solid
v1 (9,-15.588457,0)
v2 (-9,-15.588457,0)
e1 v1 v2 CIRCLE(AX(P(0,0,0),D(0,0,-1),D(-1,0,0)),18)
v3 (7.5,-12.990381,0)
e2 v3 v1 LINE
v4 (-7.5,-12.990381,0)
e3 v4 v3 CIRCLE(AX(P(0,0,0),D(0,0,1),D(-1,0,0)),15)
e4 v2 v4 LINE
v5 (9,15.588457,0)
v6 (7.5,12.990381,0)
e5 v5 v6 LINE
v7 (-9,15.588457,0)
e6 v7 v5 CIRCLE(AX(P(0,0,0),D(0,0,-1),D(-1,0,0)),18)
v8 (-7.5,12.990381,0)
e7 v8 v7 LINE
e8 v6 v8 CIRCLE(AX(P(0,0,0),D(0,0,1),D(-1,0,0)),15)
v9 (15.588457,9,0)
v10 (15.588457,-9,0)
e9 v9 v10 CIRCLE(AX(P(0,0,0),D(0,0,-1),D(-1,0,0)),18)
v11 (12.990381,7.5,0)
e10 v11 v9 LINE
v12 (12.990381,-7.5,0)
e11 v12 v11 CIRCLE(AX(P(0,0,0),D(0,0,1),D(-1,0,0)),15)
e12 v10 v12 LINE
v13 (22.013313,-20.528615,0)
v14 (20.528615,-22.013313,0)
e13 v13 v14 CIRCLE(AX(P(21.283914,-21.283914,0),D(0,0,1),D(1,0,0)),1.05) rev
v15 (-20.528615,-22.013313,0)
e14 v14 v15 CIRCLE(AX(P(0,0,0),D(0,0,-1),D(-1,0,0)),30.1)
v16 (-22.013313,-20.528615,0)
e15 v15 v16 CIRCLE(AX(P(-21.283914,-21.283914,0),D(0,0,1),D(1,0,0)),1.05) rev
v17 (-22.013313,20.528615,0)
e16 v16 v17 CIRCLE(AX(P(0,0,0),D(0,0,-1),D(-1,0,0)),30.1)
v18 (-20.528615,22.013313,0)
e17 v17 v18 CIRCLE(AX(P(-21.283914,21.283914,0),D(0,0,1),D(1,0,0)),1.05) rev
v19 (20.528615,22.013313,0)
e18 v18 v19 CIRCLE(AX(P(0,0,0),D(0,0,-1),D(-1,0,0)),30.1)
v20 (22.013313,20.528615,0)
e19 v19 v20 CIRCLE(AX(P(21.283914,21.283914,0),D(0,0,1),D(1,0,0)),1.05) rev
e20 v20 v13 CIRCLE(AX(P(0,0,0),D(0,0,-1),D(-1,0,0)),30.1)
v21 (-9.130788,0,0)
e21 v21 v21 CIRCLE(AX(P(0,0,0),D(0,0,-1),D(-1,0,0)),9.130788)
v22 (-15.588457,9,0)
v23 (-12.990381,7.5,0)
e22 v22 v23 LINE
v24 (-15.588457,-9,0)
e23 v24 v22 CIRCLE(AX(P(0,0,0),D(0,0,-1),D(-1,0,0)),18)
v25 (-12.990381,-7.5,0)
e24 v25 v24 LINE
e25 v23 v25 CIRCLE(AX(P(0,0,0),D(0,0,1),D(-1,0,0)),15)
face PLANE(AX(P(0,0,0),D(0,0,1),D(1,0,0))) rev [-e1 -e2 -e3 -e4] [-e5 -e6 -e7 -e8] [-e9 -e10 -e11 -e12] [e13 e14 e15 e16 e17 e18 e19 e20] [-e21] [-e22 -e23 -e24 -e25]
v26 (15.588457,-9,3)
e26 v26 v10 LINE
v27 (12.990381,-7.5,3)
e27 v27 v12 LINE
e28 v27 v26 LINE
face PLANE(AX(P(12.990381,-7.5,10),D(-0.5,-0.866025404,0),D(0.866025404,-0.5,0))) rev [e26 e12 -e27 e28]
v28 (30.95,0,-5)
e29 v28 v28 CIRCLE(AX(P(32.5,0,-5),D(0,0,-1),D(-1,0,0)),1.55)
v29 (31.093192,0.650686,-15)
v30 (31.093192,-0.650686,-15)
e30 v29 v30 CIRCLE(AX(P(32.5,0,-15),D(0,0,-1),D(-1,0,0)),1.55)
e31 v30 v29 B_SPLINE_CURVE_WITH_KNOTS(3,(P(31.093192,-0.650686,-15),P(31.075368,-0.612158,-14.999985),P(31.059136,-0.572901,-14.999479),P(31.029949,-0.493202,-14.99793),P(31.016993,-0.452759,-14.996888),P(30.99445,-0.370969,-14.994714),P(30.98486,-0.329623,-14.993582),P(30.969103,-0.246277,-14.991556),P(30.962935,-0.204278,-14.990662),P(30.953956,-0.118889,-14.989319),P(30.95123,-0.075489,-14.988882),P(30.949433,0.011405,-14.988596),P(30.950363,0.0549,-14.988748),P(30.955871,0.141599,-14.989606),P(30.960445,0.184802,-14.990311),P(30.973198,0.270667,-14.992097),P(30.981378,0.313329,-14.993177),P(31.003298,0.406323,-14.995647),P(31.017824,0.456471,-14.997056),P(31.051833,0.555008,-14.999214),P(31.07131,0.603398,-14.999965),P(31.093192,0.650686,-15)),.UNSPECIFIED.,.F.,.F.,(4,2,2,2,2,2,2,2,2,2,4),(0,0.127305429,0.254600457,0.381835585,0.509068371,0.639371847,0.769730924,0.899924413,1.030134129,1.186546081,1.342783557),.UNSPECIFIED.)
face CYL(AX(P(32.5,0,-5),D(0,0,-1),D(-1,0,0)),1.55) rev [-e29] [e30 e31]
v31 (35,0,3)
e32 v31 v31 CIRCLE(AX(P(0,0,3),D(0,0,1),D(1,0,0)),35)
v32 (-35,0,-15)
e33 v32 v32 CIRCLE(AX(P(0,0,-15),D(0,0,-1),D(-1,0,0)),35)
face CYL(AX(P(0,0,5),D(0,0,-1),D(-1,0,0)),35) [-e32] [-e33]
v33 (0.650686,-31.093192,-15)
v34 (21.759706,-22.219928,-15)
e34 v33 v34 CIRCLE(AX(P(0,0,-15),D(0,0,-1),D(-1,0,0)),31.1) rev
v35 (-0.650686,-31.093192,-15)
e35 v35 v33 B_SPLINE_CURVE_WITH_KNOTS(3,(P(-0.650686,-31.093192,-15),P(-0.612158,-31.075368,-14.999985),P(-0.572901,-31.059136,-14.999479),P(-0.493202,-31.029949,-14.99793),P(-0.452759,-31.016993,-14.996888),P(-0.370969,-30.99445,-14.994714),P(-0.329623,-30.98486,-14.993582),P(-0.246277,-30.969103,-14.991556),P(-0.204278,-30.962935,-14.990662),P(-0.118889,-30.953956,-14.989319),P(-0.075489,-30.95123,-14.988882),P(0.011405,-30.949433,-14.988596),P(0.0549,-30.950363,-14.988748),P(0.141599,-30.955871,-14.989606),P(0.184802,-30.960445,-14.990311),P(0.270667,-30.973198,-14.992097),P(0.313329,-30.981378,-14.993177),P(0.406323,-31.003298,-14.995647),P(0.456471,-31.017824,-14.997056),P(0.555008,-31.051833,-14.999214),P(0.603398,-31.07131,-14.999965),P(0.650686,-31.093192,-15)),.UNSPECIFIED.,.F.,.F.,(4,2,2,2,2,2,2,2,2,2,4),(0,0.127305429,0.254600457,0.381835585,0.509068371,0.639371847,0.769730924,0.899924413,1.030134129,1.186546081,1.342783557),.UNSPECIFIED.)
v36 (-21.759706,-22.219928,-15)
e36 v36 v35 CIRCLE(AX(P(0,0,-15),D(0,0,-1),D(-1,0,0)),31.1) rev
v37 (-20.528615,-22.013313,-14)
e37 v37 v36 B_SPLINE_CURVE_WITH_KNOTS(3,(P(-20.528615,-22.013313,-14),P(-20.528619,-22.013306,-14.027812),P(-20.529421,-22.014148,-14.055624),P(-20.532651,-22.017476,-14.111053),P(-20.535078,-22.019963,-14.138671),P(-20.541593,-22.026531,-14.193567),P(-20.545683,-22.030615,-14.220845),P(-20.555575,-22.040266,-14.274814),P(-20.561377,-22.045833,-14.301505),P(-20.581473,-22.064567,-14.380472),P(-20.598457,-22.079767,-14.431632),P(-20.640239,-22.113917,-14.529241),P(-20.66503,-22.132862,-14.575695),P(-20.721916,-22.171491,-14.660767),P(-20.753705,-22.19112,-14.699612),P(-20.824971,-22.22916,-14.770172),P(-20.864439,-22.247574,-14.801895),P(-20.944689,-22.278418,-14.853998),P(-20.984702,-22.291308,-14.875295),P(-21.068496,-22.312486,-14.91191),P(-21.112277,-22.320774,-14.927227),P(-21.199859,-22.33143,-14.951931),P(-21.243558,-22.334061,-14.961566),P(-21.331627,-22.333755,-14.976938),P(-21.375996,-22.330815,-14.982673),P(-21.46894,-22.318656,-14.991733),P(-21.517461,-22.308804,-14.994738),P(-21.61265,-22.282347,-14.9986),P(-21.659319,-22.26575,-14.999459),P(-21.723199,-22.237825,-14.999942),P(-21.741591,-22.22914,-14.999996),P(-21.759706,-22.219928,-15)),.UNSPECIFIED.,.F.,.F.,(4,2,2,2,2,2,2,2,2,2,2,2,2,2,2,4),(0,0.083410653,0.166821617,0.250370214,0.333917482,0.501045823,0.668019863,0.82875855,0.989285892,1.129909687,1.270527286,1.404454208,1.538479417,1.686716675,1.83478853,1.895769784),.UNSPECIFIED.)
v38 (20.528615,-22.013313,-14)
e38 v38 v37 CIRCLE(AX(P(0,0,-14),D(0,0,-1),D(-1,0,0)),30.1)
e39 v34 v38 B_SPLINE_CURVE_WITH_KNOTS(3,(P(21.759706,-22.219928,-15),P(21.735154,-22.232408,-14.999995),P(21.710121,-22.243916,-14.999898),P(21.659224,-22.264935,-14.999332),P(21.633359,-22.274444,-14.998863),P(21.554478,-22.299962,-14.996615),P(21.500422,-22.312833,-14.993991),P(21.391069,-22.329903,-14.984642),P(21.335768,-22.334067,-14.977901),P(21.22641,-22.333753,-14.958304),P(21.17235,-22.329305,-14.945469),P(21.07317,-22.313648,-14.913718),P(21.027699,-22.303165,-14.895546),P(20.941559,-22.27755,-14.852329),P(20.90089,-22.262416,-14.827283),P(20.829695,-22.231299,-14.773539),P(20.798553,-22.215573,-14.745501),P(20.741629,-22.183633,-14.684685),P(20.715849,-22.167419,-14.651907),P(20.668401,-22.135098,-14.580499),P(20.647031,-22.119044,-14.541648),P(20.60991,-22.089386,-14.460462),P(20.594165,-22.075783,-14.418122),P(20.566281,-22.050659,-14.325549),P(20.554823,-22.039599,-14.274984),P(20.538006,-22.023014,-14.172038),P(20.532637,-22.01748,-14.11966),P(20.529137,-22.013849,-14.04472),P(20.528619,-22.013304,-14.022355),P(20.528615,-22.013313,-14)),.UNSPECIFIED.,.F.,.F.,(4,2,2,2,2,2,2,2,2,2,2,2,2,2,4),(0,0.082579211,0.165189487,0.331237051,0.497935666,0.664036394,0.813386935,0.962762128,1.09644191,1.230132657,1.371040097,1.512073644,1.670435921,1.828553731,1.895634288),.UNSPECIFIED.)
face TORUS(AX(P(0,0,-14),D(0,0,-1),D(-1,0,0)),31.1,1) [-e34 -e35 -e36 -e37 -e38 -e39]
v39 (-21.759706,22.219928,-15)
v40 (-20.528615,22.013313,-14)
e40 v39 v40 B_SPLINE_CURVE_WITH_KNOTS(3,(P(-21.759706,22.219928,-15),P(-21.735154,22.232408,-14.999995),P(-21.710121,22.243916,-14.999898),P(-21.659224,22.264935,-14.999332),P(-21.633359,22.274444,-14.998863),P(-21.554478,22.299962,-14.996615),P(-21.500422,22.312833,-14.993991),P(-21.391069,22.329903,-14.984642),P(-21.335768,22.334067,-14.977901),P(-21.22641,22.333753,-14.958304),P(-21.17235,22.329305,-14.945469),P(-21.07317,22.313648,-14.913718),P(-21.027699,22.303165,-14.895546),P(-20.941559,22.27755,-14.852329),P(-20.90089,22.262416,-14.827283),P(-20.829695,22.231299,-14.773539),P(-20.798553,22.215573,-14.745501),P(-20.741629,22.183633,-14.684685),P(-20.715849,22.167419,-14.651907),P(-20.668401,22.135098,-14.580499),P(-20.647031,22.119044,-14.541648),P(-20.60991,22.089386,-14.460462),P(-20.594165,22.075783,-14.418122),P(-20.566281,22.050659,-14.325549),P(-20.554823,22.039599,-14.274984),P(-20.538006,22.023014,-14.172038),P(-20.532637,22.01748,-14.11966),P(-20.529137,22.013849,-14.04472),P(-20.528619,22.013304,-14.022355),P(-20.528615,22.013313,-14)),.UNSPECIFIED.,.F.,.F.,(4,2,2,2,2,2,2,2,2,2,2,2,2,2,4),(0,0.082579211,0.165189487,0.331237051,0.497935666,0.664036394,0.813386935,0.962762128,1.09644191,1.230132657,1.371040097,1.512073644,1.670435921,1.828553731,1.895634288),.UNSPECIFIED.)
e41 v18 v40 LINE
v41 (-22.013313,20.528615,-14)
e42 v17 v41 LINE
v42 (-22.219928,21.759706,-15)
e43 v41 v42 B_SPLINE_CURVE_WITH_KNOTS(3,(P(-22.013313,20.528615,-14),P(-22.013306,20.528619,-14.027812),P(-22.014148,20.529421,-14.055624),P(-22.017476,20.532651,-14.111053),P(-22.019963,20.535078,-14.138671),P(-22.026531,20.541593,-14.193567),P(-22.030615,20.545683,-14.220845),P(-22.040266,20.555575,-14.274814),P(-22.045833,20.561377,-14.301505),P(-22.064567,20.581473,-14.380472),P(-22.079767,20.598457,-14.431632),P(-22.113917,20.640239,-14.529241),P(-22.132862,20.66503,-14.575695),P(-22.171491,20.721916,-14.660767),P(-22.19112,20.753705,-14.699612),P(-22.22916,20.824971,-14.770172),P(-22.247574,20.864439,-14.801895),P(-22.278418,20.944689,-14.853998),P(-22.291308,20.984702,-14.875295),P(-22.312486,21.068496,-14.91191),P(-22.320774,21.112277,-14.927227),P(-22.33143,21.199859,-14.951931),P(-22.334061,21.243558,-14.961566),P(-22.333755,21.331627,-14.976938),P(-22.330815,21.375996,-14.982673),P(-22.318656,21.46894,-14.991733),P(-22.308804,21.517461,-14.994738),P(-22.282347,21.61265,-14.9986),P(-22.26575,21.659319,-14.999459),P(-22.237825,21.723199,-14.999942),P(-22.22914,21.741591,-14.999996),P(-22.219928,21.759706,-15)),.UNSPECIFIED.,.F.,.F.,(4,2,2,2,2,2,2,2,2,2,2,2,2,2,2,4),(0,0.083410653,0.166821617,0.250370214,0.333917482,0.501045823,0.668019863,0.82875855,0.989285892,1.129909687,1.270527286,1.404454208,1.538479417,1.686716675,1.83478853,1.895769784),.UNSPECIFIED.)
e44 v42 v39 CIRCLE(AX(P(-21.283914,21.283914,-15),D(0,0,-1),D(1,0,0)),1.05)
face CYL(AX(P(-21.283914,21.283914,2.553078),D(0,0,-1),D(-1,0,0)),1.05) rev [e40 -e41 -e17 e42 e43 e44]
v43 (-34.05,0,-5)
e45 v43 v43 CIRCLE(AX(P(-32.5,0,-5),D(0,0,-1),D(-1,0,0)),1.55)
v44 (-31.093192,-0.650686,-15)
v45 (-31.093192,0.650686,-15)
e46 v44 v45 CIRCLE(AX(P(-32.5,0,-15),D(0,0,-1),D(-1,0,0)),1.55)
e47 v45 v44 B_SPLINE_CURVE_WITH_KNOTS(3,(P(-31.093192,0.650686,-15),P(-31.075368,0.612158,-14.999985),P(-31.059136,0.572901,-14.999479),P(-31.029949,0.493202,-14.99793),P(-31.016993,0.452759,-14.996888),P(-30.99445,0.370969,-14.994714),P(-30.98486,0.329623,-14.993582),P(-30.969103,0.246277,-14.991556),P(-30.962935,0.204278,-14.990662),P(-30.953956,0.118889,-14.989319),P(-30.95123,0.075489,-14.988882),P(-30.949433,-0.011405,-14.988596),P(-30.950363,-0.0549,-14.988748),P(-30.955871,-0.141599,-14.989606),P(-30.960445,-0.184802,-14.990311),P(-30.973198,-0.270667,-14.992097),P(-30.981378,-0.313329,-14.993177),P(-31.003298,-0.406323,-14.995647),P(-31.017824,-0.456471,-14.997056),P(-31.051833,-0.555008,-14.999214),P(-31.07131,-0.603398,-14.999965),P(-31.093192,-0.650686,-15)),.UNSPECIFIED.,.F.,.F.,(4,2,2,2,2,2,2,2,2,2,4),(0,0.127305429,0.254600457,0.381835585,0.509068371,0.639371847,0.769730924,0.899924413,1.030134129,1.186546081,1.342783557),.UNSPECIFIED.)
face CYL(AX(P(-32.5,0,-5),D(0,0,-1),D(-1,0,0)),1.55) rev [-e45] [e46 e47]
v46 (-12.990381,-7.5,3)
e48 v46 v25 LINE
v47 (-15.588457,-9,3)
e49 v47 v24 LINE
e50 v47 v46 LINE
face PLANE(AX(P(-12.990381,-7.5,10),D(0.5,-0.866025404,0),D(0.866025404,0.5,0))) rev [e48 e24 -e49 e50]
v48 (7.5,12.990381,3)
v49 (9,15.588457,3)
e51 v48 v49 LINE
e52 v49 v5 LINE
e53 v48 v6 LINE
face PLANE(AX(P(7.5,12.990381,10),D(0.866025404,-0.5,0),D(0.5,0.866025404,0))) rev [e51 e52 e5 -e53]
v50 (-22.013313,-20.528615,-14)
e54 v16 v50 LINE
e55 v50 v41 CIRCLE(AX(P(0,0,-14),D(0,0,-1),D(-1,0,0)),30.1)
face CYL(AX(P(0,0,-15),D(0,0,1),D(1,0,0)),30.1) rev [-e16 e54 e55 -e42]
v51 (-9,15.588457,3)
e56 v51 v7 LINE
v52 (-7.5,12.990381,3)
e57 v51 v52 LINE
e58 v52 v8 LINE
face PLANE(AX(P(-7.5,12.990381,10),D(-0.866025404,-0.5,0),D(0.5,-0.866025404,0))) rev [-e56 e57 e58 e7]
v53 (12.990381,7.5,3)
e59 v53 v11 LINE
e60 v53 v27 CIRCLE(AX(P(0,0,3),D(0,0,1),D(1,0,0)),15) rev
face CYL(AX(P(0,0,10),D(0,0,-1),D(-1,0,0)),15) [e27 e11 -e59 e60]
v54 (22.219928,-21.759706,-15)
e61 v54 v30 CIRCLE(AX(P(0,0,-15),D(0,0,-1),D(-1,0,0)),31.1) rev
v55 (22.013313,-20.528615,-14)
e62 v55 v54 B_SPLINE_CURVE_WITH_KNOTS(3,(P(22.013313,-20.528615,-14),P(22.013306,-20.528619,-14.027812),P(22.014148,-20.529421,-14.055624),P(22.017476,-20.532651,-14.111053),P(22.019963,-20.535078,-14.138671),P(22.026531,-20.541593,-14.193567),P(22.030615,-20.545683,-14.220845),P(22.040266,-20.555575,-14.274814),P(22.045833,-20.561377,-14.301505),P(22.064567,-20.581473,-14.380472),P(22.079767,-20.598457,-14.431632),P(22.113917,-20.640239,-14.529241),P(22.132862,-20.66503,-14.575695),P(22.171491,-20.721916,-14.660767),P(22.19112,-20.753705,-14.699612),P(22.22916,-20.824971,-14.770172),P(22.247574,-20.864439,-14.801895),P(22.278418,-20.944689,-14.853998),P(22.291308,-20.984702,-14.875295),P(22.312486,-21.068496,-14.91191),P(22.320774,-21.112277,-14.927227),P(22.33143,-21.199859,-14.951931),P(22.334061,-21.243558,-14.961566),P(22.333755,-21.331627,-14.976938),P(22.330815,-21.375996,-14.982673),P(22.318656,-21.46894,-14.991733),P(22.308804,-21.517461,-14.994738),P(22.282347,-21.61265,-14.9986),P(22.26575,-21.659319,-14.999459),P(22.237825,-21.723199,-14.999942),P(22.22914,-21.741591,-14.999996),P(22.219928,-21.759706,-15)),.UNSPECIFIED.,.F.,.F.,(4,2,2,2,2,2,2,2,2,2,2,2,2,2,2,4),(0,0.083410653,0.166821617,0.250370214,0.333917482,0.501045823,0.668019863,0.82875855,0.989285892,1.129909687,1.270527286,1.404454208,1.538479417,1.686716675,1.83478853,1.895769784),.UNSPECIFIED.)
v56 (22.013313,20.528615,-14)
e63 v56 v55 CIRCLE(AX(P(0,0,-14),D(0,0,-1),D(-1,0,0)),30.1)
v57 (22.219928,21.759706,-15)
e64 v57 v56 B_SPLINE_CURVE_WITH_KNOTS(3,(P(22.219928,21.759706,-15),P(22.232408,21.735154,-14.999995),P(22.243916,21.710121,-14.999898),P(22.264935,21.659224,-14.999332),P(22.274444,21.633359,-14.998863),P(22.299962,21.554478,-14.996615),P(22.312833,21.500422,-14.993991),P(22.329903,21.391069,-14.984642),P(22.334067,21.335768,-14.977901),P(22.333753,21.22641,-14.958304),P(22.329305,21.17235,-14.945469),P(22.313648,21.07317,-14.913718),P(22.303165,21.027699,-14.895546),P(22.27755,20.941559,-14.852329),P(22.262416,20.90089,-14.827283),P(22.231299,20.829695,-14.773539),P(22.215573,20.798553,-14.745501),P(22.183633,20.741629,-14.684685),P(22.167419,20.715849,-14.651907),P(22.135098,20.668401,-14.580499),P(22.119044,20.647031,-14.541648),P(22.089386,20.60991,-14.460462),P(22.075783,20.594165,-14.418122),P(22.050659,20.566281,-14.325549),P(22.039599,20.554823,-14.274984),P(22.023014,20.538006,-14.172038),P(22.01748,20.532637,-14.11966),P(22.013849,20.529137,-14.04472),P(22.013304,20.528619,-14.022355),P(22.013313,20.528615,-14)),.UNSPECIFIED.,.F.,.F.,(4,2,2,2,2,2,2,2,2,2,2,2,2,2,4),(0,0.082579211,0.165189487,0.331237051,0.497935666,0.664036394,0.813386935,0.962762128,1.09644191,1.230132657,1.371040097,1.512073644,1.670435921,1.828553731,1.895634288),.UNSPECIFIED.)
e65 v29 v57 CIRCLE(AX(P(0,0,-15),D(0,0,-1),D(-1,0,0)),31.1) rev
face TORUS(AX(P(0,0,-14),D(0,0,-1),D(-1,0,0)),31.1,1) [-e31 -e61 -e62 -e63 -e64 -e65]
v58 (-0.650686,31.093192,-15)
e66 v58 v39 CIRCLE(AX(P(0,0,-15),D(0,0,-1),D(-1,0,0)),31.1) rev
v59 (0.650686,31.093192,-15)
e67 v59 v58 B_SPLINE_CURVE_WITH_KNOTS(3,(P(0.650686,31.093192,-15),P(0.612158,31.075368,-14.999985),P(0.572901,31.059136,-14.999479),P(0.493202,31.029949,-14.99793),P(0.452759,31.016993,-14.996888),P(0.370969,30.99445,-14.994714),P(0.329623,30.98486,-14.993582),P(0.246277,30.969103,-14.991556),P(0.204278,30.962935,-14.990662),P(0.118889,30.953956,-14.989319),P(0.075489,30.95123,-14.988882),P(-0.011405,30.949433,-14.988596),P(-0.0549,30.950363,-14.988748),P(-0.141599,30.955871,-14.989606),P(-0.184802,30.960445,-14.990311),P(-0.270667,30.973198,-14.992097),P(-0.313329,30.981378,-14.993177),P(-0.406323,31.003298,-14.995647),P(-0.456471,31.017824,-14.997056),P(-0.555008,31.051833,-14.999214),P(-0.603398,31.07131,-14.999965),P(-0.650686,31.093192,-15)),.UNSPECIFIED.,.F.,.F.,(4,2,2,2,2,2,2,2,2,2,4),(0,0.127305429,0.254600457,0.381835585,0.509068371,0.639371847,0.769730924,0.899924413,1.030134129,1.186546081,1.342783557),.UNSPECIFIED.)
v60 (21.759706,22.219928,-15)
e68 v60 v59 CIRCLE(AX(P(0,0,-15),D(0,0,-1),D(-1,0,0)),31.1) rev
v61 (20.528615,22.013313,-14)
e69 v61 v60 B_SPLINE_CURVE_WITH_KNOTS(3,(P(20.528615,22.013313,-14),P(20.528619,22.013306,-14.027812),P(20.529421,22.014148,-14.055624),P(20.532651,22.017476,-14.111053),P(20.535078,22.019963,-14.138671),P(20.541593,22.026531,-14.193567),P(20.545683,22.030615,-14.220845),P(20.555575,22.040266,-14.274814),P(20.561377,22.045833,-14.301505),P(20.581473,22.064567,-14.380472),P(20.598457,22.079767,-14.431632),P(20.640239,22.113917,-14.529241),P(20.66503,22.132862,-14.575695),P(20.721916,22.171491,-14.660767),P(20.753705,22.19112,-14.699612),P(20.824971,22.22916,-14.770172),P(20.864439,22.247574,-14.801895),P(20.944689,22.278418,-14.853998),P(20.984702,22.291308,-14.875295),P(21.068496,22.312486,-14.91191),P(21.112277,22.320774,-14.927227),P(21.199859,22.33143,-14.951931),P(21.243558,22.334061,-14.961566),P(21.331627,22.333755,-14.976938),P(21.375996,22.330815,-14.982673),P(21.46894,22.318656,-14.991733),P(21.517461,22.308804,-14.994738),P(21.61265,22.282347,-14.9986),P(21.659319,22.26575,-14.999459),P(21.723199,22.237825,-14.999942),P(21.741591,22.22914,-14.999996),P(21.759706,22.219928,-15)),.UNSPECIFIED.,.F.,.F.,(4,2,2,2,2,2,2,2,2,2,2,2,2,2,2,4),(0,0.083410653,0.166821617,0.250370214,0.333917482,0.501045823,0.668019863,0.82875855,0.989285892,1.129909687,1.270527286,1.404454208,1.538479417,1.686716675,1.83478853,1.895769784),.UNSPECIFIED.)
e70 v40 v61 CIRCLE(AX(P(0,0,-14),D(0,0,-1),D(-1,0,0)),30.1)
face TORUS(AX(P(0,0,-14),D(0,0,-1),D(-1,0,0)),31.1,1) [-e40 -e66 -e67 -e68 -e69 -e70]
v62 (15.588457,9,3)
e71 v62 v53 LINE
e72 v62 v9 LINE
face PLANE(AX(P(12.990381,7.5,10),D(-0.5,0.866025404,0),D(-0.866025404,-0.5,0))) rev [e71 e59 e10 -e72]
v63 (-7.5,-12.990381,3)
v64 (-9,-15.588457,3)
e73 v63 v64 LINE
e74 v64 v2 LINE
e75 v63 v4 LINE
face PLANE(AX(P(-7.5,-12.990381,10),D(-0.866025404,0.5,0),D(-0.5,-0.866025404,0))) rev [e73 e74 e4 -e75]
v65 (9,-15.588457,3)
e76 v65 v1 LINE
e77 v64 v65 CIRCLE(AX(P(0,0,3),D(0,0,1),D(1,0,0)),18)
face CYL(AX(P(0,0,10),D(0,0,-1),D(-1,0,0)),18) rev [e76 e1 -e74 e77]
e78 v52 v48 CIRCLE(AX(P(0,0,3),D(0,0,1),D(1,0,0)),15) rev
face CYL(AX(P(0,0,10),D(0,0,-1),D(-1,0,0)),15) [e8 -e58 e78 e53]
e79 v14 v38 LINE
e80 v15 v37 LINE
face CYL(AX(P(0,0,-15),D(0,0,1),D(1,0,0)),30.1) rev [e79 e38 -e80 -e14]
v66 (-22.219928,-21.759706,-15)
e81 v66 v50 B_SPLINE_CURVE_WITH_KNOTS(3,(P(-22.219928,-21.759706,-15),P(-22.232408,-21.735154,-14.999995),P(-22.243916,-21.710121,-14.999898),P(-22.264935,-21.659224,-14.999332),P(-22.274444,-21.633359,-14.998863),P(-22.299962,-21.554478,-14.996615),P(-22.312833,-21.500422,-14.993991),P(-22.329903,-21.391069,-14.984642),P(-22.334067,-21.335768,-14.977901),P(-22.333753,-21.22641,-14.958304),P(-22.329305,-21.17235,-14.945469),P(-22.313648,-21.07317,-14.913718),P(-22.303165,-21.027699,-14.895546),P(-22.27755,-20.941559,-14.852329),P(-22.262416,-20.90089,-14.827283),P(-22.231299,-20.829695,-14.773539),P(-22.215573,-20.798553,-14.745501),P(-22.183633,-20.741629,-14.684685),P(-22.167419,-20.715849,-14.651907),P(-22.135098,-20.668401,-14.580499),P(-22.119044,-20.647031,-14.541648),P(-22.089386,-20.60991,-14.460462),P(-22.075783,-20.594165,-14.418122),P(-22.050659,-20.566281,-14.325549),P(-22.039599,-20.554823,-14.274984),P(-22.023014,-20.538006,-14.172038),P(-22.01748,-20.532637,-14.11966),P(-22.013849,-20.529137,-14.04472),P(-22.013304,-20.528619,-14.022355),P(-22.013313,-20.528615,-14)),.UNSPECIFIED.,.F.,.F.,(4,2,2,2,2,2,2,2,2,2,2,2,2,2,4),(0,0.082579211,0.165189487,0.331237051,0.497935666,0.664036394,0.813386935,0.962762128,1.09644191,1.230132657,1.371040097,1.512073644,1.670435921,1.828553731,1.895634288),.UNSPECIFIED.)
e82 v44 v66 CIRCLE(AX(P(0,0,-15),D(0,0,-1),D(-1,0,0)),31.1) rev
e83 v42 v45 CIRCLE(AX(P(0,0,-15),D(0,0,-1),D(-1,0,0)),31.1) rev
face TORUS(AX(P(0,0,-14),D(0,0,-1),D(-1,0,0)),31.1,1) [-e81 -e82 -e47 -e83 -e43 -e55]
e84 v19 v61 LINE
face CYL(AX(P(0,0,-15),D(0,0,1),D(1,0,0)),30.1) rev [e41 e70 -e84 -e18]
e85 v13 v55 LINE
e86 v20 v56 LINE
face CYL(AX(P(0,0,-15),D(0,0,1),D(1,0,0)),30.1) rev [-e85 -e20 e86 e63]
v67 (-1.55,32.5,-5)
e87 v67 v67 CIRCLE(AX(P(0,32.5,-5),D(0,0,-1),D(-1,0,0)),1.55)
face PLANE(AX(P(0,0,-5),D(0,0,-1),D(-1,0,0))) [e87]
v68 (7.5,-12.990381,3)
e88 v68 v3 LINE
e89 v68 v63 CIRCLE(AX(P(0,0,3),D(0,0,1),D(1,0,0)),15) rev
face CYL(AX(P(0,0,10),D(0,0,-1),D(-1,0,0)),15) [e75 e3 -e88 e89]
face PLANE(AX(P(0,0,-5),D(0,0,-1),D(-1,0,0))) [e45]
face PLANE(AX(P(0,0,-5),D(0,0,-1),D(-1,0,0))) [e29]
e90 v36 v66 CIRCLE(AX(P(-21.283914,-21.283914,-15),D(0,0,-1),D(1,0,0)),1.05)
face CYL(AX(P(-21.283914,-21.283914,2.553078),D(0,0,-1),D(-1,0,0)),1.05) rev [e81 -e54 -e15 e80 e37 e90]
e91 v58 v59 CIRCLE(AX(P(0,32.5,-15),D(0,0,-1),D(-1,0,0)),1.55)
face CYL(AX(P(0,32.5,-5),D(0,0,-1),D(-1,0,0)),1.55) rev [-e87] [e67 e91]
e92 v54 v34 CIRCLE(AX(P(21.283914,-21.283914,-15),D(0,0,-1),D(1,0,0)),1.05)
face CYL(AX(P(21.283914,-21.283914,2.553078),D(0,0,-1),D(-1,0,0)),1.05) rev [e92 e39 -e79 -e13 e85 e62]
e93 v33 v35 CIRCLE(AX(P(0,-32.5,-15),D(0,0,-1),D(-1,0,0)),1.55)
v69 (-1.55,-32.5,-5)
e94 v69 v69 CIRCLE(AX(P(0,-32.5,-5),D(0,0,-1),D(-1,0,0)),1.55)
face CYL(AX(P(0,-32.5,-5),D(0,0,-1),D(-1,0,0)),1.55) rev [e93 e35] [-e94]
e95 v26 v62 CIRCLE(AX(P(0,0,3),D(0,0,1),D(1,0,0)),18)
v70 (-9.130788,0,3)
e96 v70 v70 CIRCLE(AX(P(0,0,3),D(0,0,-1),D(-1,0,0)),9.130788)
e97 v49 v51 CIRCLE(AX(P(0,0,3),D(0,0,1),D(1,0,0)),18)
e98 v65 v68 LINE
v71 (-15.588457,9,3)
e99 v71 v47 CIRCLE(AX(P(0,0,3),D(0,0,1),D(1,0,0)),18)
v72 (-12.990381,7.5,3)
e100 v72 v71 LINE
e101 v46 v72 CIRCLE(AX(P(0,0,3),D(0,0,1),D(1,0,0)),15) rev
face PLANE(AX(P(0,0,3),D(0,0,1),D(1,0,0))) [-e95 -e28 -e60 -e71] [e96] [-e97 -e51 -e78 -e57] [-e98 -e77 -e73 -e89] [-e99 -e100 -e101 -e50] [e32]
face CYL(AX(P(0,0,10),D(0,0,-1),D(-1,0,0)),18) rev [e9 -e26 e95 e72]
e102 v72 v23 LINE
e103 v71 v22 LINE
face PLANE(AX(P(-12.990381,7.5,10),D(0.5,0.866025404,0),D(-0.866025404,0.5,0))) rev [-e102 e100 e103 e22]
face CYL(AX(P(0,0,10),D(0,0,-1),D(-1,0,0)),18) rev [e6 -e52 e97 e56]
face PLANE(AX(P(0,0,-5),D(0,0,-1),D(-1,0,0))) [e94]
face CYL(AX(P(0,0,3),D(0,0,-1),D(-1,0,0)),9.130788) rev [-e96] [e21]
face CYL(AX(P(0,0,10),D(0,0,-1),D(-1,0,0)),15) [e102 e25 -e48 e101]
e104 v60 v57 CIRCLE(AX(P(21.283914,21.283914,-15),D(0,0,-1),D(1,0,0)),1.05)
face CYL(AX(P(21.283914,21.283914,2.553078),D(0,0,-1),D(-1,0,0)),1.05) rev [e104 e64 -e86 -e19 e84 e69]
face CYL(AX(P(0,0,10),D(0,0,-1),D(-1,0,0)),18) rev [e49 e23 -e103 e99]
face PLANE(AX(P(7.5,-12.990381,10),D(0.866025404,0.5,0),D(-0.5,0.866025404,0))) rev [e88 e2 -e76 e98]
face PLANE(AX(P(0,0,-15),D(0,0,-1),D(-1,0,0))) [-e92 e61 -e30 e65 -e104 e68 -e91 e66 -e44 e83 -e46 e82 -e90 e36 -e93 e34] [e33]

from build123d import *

# Parameters (mm, degrees)
SKETCH_2_R          = 35
SKETCH_2_R_2        = 5.5
EXTRUDE_1_DEPTH     = 5
EXTRUDE_START       = 15
SKETCH_3_R          = 35
SKETCH_3_R_2        = 30.1
EXTRUDE_2_DEPTH     = 15
SKETCH_4_R          = 1.55
CUT_EXTRUDE_1_DEPTH = 10
CUT_EXTRUDE_5_DEPTH = 15
FILLET_1_R          = 1
CUT_EXTRUDE_START   = -2
SKETCH_10_R         = 35
CUT_EXTRUDE_6_DEPTH = 2
CUT_EXTRUDE_7_DEPTH = 10
SKETCH1_R           = 9.130787709
CUT_EXTRUDE1_DEPTH  = 52.720402193


with BuildPart() as part:
    # 草图2 → 凸台-拉伸1 (new body)
    with BuildSketch(Plane.XY):
        Circle(SKETCH_2_R)
        Circle(SKETCH_2_R_2, mode=Mode.SUBTRACT)
    extrude(amount=EXTRUDE_1_DEPTH)

    # 草图3 → 凸台-拉伸2 (add)
    with BuildSketch(Plane(origin=(0, 0, 0), x_dir=(-1, 0, 0), z_dir=(0, 0, -1)).offset(EXTRUDE_START)):
        Circle(SKETCH_3_R)
        Circle(SKETCH_3_R_2, mode=Mode.SUBTRACT)
    extrude(amount=-EXTRUDE_2_DEPTH)

    # 草图4 → 切除-拉伸1 (cut)
    with BuildSketch(Plane(origin=(0, 0, -15), x_dir=(-1, 0, 0), z_dir=(0, 0, -1))):
        with Locations((0, 32.5)):
            Circle(SKETCH_4_R)
        with Locations((32.5, 0)):
            Circle(SKETCH_4_R)
        with Locations((0, -32.5)):
            Circle(SKETCH_4_R)
        with Locations((-32.5, 0)):
            Circle(SKETCH_4_R)
    extrude(amount=-CUT_EXTRUDE_1_DEPTH, mode=Mode.SUBTRACT)

    # 草图9 → 切除-拉伸5 (cut)
    with BuildSketch(Plane(origin=(0, 0, -15), x_dir=(-1, 0, 0), z_dir=(0, 0, -1))):
        with BuildLine():
            ThreePointArc((-22.013313369, 20.528615017), (-22.026376234, 22.026376234), (-20.528615017, 22.013313369))
            ThreePointArc((-20.528615017, 22.013313369), (-21.283914114, 21.283914114), (-22.013313369, 20.528615017))
        make_face()
        with BuildLine():
            ThreePointArc((20.528615017, 22.013313369), (22.026376234, 22.026376234), (22.013313369, 20.528615017))
            ThreePointArc((22.013313369, 20.528615017), (21.283914114, 21.283914114), (20.528615017, 22.013313369))
        make_face()
        with BuildLine():
            ThreePointArc((22.013313369, -20.528615017), (22.026376234, -22.026376234), (20.528615017, -22.013313369))
            ThreePointArc((20.528615017, -22.013313369), (21.283914114, -21.283914114), (22.013313369, -20.528615017))
        make_face()
        with BuildLine():
            ThreePointArc((-20.528615017, -22.013313369), (-22.026376234, -22.026376234), (-22.013313369, -20.528615017))
            ThreePointArc((-22.013313369, -20.528615017), (-21.283914114, -21.283914114), (-20.528615017, -22.013313369))
        make_face()
    extrude(amount=-CUT_EXTRUDE_5_DEPTH, mode=Mode.SUBTRACT)

    # 圆角1
    # the kernel refuses this fillet: 1 mm, written as the material it takes off along each edge
    with BuildSketch(Plane(origin=(0, 0, -15), x_dir=(-0.7403558797037455, 0.6722151228498904, 0), z_dir=(-0.6722151228498904, -0.7403558797037455, 0))) as fillet_1_piece_1:
        with BuildLine():
            CenterArc((30.1 + FILLET_1_R, -FILLET_1_R), FILLET_1_R, 90, 90)
            Line((30.1, -FILLET_1_R), (30.1, 0))
            Line((30.1, 0), (30.1 + FILLET_1_R, 0))
        make_face()
    revolve(axis=Axis((0, 0, -15), (0, 0, -1)), revolution_arc=95.523479776, mode=Mode.SUBTRACT)
    with BuildSketch(Plane(origin=(0, 0, -15), x_dir=(0.6722151228498918, 0.7403558797037441, 0), z_dir=(-0.7403558797037441, 0.6722151228498918, 0))) as fillet_1_piece_2:
        with BuildLine():
            CenterArc((30.1 + FILLET_1_R, -FILLET_1_R), FILLET_1_R, 90, 90)
            Line((30.1, -FILLET_1_R), (30.1, 0))
            Line((30.1, 0), (30.1 + FILLET_1_R, 0))
        make_face()
    revolve(axis=Axis((0, 0, -15), (0, 0, -1)), revolution_arc=95.523479776, mode=Mode.SUBTRACT)
    with BuildSketch(Plane(origin=(0, 0, -15), x_dir=(0.7403558797037453, -0.6722151228498905, 0), z_dir=(0.6722151228498905, 0.7403558797037453, 0))) as fillet_1_piece_3:
        with BuildLine():
            CenterArc((30.1 + FILLET_1_R, -FILLET_1_R), FILLET_1_R, 90, 90)
            Line((30.1, -FILLET_1_R), (30.1, 0))
            Line((30.1, 0), (30.1 + FILLET_1_R, 0))
        make_face()
    revolve(axis=Axis((0, 0, -15), (0, 0, -1)), revolution_arc=95.523479776, mode=Mode.SUBTRACT)
    with BuildSketch(Plane(origin=(0, 0, -15), x_dir=(-1, 0, 0), z_dir=(0, -1, 0))) as fillet_1_piece_4:
        with BuildLine():
            CenterArc((30.1 + FILLET_1_R, -FILLET_1_R), FILLET_1_R, 90, 90)
            Line((30.1, -FILLET_1_R), (30.1, 0))
            Line((30.1, 0), (30.1 + FILLET_1_R, 0))
        make_face()
    revolve(axis=Axis((0, 0, -15), (0, 0, -1)), revolution_arc=47.760430641, mode=Mode.SUBTRACT)
    with BuildSketch(Plane(origin=(0, 0, -15), x_dir=(-0.6722320403041436, -0.7403405189428228, 0), z_dir=(0.7403405189428228, -0.6722320403041436, 0))) as fillet_1_piece_5:
        with BuildLine():
            CenterArc((30.1 + FILLET_1_R, -FILLET_1_R), FILLET_1_R, 90, 90)
            Line((30.1, -FILLET_1_R), (30.1, 0))
            Line((30.1, 0), (30.1 + FILLET_1_R, 0))
        make_face()
    revolve(axis=Axis((0, 0, -15), (0, 0, -1)), revolution_arc=47.760430641, mode=Mode.SUBTRACT)

    # 草图10 → 切除-拉伸6 (cut)
    with BuildSketch(Plane.XY.offset(5).offset(CUT_EXTRUDE_START)):
        with Locations(Location((0, 0, 0), (0, 0, 180))):
            Circle(SKETCH_10_R)
    extrude(amount=CUT_EXTRUDE_6_DEPTH, mode=Mode.SUBTRACT)

    # 草图11 → 切除-拉伸7 (cut)
    with BuildSketch(Plane(origin=(0, 0, 0), x_dir=(-1, 0, 0), z_dir=(0, 0, -1))):
        with BuildLine():
            Line((12.990381057, 7.5), (15.588457268, 9))
            ThreePointArc((15.588457268, 9), (18, 0), (15.588457268, -9))
            Line((15.588457268, -9), (12.990381057, -7.5))
            ThreePointArc((12.990381057, -7.5), (15, 0), (12.990381057, 7.5))
        make_face()
        with BuildLine():
            Line((-7.5, 12.990381057), (-9, 15.588457268))
            ThreePointArc((-9, 15.588457268), (0, 18), (9, 15.588457268))
            Line((9, 15.588457268), (7.5, 12.990381057))
            ThreePointArc((7.5, 12.990381057), (0, 15), (-7.5, 12.990381057))
        make_face()
        with BuildLine():
            Line((7.5, -12.990381057), (9, -15.588457268))
            ThreePointArc((9, -15.588457268), (0, -18), (-9, -15.588457268))
            Line((-9, -15.588457268), (-7.5, -12.990381057))
            ThreePointArc((-7.5, -12.990381057), (0, -15), (7.5, -12.990381057))
        make_face()
        with BuildLine():
            Line((-12.990381057, -7.5), (-15.588457268, -9))
            ThreePointArc((-15.588457268, -9), (-18, 0), (-15.588457268, 9))
            Line((-15.588457268, 9), (-12.990381057, 7.5))
            ThreePointArc((-12.990381057, 7.5), (-15, 0), (-12.990381057, -7.5))
        make_face()
    extrude(amount=-CUT_EXTRUDE_7_DEPTH, mode=Mode.SUBTRACT)

    # Sketch1 → Cut-Extrude1 (cut, through all)
    with BuildSketch(Plane(origin=(0, 0, 0), x_dir=(-1, 0, 0), z_dir=(0, 0, -1))):
        Circle(SKETCH1_R)
    extrude(amount=-CUT_EXTRUDE1_DEPTH, mode=Mode.SUBTRACT)


solid = part.part
